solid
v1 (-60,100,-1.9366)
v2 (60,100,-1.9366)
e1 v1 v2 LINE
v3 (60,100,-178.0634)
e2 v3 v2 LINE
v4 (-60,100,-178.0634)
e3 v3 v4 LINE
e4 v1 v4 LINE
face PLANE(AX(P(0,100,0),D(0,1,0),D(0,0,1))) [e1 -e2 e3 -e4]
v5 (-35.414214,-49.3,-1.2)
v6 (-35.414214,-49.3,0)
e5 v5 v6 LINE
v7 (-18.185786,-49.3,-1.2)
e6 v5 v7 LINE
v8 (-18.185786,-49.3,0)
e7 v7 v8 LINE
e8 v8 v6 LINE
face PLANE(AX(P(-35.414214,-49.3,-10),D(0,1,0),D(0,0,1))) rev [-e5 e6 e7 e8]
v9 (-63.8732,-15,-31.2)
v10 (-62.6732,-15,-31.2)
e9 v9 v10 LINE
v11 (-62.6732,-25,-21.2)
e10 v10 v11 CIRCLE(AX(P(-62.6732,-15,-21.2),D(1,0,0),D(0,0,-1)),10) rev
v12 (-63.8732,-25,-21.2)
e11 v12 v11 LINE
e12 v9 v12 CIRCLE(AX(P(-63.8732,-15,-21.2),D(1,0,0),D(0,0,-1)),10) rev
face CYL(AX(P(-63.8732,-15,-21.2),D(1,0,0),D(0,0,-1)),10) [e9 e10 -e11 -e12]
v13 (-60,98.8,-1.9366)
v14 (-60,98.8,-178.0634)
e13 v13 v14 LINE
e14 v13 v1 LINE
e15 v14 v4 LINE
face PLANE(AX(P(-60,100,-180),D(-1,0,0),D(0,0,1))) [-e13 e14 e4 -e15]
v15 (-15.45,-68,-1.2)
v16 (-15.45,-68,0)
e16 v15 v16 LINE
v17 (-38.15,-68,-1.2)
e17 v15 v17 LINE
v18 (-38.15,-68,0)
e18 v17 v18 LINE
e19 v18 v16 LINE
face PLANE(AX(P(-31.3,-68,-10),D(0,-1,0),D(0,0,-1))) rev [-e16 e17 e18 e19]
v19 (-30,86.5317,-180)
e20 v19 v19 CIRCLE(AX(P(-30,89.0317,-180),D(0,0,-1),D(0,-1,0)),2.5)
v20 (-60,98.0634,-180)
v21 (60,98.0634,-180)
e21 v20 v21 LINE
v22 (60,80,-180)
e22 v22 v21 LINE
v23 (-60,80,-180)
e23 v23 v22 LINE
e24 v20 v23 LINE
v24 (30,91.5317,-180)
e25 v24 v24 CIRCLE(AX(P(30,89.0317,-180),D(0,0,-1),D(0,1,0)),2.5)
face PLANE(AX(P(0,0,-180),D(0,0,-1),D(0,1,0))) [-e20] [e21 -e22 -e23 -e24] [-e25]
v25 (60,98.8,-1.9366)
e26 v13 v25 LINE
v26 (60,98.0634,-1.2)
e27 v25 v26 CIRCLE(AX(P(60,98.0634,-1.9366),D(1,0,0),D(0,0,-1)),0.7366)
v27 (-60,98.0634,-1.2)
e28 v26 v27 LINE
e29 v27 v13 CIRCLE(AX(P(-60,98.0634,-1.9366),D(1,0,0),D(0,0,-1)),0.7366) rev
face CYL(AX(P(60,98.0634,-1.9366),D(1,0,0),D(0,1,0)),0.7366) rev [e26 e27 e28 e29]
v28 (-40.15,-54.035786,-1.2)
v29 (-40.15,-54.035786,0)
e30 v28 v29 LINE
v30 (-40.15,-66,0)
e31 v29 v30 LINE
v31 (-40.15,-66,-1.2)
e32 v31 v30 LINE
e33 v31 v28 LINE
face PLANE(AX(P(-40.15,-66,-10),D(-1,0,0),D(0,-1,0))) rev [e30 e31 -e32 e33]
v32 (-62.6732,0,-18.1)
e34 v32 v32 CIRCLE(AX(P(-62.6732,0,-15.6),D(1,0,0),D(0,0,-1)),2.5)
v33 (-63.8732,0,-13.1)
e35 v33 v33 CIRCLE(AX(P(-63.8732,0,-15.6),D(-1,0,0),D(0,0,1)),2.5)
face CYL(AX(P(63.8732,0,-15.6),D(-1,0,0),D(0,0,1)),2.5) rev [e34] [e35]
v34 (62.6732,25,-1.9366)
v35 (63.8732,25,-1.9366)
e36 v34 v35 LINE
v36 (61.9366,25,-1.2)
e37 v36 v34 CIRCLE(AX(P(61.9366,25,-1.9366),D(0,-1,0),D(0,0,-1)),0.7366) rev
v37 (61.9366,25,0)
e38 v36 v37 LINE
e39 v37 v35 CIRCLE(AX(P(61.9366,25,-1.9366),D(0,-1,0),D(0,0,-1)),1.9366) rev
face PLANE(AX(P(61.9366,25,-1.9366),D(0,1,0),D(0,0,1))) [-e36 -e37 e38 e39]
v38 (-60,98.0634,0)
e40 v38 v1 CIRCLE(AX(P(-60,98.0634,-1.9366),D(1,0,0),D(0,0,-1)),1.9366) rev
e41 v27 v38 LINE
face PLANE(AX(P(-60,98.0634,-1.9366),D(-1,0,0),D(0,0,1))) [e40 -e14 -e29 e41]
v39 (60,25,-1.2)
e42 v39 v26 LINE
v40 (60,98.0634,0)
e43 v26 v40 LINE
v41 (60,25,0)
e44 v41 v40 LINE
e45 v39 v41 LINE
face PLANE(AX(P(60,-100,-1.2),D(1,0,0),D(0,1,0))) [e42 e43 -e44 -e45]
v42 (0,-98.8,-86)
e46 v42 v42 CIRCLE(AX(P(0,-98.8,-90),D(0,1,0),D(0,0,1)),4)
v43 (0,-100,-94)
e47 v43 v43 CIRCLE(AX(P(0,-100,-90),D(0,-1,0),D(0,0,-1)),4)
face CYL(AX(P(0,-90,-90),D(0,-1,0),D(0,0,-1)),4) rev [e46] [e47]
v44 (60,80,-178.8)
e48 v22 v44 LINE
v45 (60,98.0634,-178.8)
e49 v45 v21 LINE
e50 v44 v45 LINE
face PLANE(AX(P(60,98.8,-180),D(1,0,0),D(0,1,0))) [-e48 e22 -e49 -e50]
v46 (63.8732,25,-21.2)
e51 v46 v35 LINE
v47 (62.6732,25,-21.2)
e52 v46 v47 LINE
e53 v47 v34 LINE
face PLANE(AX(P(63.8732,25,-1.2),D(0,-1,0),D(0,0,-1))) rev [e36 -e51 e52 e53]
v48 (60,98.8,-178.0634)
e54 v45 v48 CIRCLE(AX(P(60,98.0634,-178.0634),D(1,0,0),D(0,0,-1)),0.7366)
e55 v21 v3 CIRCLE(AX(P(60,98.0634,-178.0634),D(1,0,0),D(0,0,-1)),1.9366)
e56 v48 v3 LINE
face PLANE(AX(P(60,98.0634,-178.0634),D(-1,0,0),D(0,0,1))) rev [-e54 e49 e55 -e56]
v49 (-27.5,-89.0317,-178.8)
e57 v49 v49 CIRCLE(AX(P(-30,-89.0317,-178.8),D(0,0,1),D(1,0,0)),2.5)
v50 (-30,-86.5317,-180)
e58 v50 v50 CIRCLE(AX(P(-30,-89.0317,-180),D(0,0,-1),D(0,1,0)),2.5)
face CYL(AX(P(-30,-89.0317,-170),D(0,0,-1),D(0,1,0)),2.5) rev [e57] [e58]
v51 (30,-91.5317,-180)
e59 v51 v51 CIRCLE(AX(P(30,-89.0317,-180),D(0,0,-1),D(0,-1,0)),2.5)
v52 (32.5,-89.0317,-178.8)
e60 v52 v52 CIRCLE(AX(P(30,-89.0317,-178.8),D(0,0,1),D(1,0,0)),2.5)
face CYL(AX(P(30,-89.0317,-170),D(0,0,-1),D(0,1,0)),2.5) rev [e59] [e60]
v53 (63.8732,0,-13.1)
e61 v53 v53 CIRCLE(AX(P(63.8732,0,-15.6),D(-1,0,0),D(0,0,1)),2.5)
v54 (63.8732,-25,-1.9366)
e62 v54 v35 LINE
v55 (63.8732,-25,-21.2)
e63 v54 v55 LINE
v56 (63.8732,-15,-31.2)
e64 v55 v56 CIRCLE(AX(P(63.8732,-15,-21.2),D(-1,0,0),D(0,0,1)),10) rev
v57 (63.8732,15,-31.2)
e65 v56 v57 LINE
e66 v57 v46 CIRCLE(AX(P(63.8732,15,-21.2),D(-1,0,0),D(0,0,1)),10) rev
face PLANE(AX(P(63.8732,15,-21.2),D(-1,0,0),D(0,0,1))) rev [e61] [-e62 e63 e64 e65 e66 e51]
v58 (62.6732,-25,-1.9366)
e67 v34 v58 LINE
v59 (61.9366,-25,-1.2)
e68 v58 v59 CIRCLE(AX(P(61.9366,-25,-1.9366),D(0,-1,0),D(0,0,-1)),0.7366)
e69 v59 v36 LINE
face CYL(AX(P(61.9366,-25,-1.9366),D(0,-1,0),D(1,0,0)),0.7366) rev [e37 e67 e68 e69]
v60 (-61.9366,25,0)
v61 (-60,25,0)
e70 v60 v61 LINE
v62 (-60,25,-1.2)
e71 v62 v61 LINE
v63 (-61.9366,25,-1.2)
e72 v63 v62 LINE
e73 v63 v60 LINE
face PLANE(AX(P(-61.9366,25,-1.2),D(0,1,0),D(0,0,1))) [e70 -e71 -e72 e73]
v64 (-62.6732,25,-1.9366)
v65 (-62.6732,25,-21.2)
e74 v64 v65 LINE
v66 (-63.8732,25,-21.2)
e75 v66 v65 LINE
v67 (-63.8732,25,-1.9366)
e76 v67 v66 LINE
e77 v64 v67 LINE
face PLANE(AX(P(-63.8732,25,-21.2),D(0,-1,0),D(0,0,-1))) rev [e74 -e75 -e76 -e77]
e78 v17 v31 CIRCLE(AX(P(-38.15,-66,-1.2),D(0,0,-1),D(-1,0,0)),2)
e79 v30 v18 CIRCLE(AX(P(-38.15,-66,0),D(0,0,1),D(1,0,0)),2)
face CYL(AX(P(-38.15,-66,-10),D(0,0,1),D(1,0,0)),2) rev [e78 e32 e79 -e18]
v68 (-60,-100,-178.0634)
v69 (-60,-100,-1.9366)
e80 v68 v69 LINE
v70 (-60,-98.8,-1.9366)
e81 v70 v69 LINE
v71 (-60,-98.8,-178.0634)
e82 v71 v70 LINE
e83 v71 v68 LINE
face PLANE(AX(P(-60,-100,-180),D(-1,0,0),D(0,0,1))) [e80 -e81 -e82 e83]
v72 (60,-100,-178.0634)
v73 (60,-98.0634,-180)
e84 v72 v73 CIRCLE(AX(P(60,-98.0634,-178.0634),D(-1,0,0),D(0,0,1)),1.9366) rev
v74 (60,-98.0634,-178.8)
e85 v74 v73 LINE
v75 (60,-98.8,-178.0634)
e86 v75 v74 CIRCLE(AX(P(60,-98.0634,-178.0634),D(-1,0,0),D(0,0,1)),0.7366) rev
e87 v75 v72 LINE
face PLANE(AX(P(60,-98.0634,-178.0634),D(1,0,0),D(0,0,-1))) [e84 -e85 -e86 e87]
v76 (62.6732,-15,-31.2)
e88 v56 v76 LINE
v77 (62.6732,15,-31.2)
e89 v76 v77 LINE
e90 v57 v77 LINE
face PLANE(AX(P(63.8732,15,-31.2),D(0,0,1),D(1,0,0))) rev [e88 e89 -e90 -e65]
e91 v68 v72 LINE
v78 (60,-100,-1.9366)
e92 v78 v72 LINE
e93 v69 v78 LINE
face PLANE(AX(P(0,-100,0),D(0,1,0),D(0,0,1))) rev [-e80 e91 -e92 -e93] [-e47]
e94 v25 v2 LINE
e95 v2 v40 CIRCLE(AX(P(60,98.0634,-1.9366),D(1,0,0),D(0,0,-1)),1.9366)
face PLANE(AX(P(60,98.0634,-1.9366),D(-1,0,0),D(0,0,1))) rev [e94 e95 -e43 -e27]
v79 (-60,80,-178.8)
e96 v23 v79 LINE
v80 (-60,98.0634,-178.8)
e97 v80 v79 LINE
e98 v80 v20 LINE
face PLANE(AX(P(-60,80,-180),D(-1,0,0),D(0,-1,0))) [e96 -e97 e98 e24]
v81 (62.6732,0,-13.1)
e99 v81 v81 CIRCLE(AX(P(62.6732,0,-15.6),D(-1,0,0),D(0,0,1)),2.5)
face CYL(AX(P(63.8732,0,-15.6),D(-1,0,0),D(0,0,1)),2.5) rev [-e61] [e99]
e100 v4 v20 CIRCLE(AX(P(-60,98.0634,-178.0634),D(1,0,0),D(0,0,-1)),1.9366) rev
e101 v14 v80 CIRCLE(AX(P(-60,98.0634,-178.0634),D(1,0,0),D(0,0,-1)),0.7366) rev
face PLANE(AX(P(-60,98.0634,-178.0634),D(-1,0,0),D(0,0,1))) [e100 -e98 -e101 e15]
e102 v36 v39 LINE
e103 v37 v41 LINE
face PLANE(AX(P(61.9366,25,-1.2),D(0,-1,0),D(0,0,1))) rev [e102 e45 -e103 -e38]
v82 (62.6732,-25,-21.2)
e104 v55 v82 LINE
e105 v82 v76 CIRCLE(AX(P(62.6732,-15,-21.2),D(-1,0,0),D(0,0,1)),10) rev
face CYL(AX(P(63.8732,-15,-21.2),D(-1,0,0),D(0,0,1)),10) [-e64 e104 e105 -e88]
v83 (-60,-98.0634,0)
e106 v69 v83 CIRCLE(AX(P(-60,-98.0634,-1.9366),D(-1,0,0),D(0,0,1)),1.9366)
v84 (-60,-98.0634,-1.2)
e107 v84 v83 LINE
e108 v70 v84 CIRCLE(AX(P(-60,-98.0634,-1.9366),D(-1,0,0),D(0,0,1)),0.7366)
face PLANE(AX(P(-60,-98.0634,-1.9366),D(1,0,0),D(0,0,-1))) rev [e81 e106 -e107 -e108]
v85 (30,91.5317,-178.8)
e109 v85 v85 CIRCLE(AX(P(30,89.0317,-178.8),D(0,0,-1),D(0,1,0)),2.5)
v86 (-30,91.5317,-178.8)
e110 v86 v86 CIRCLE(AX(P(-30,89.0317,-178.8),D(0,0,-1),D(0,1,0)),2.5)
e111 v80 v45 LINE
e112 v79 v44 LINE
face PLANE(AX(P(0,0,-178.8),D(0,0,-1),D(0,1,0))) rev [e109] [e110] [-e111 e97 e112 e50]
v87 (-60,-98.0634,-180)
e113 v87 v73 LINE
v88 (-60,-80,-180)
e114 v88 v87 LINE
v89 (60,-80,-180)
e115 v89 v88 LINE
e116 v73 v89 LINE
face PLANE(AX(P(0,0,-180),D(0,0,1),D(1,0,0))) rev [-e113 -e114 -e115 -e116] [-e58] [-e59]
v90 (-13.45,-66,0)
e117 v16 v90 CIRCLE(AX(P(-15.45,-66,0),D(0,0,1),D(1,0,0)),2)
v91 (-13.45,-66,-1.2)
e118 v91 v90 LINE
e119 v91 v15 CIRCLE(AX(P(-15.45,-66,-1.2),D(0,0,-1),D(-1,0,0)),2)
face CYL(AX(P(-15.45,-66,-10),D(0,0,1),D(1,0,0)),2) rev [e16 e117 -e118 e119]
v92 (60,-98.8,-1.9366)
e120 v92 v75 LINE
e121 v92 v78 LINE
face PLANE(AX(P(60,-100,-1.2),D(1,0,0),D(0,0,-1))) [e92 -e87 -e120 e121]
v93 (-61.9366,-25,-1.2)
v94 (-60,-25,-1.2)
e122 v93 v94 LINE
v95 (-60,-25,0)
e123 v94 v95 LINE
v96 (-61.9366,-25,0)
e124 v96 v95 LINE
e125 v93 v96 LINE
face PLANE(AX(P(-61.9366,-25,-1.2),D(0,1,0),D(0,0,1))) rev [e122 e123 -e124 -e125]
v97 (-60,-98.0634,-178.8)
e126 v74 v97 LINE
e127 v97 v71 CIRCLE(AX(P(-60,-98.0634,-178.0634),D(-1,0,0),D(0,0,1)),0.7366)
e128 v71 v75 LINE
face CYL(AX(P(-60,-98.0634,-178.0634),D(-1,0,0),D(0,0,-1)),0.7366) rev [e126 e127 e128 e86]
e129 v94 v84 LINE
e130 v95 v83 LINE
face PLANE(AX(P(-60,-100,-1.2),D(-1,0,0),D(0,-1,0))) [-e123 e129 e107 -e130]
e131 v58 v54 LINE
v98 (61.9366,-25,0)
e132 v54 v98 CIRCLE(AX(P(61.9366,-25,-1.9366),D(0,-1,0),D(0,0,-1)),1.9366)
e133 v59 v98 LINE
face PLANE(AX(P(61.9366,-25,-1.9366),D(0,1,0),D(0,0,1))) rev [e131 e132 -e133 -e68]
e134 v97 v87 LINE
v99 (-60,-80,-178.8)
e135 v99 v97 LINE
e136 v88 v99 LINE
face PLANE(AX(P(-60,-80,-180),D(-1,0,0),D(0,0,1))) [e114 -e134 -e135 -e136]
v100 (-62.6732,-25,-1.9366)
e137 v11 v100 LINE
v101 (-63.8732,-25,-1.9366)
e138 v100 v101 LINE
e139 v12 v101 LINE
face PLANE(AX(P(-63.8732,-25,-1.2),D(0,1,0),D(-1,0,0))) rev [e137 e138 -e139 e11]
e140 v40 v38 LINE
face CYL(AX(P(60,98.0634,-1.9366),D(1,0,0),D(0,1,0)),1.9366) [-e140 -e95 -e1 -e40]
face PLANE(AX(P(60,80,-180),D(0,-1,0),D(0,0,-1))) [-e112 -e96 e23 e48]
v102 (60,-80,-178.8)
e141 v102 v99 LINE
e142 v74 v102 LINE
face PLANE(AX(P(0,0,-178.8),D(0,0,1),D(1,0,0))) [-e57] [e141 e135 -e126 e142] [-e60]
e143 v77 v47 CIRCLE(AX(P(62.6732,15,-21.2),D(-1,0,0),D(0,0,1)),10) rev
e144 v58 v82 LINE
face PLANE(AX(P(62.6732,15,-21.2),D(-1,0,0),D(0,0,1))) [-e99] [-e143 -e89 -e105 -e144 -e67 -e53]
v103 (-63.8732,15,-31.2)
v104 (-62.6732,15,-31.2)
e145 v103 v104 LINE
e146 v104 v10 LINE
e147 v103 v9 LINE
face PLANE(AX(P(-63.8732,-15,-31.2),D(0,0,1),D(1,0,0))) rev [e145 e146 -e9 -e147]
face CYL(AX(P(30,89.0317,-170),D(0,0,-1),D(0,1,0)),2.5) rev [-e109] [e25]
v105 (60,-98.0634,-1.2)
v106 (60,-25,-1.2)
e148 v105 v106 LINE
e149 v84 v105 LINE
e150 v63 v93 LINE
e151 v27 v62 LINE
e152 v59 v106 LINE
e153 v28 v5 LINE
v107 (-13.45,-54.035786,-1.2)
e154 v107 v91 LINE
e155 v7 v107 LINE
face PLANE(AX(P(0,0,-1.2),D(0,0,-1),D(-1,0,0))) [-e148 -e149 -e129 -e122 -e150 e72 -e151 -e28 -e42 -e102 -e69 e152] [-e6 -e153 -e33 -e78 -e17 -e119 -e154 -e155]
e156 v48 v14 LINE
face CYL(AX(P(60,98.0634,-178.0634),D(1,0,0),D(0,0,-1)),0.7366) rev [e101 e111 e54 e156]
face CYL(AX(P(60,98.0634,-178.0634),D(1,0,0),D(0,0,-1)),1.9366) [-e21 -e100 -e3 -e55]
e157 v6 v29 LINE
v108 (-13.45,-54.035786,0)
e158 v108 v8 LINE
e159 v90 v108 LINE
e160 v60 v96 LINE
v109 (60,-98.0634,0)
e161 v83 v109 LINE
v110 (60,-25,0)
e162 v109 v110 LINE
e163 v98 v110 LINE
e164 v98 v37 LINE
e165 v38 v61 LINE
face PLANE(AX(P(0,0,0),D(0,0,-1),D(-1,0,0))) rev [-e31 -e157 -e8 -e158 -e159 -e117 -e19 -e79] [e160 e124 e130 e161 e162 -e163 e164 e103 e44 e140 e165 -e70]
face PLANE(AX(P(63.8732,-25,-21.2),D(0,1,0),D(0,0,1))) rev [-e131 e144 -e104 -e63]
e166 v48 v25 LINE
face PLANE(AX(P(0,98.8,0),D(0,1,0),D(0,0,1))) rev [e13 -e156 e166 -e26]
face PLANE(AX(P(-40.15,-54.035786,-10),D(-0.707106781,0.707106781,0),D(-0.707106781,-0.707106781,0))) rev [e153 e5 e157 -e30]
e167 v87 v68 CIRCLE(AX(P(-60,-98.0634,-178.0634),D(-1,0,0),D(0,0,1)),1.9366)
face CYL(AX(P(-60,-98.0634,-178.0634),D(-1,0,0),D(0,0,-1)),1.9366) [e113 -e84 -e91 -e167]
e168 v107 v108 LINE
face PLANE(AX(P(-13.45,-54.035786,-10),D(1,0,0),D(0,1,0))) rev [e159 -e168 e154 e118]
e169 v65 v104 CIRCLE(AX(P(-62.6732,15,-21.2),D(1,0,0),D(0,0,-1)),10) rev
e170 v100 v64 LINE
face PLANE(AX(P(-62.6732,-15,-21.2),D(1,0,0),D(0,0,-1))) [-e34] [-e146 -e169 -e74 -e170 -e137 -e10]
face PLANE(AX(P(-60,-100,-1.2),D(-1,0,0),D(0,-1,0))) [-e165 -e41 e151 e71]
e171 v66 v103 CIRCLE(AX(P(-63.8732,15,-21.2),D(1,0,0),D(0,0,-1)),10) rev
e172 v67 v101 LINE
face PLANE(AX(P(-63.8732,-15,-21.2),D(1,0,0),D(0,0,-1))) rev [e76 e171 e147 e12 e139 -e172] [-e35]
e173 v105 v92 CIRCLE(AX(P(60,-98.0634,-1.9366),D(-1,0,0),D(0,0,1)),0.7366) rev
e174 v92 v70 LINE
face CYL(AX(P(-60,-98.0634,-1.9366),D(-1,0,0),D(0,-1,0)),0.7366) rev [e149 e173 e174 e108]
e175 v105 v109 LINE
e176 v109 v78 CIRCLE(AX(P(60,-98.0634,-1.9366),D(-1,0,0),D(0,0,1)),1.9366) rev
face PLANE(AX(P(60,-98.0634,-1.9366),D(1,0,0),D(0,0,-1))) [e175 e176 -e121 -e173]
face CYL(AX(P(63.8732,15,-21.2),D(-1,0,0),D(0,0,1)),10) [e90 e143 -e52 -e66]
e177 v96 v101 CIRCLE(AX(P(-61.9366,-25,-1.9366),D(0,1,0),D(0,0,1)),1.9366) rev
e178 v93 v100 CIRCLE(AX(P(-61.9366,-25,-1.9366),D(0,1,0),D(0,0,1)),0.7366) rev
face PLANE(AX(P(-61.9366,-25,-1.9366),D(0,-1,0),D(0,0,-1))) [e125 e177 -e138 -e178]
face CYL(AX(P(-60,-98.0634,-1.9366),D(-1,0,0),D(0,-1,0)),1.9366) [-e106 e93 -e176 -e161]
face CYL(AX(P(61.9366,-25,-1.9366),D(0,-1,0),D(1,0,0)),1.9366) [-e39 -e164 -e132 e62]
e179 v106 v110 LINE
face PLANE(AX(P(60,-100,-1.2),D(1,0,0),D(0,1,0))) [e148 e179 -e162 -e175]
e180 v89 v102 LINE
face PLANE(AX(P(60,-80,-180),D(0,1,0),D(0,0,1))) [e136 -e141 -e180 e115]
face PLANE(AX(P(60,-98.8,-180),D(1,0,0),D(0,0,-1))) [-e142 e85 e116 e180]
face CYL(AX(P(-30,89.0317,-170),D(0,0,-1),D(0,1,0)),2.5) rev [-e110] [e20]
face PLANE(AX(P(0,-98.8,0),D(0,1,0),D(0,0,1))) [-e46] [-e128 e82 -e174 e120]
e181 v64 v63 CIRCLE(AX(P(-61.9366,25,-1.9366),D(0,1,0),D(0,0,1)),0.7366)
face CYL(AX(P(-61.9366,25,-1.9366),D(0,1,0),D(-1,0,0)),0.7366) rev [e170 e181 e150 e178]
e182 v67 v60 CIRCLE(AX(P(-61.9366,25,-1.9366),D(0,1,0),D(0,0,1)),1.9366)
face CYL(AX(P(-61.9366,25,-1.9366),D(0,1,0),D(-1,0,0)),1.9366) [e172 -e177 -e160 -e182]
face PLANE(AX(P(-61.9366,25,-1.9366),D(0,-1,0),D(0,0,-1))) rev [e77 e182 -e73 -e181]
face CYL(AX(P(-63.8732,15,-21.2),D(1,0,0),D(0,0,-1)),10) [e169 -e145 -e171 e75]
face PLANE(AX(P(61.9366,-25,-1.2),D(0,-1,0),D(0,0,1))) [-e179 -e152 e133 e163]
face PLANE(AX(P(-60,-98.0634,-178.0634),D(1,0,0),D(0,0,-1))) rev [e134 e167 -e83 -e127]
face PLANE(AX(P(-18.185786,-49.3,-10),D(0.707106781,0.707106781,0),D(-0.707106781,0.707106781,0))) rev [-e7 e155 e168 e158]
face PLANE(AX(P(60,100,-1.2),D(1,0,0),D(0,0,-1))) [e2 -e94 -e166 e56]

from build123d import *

# Parameters (mm, degrees)
SKETCH1_W                      = 120
SKETCH1_H                      = 200
BASE_FLANGE1_DEPTH             = 1.2
EDGE_FLANGE1_STRIP_W           = 6.2732
EDGE_FLANGE1_STRIP_H           = 1.2
EDGE_FLANGE1_STRIP_CUT_DEPTH   = 120
EDGE_FLANGE1_STRIP_2_W         = 6.2732
EDGE_FLANGE1_STRIP_2_H         = 1.2
EDGE_FLANGE1_STRIP_CUT_2_DEPTH = 120
EDGE_FLANGE1_DEPTH             = 120
EDGE_FLANGE1_BEND_DEPTH        = 120
EDGE_FLANGE3_START             = -121.9366
EDGE_FLANGE3_OUTLINE_W         = 50
EDGE_FLANGE3_OUTLINE_H         = 1.2
EDGE_FLANGE3_DEPTH             = 123.8732
EDGE_FLANGE3_START_2           = -25
EDGE_FLANGE3_2_DEPTH           = 50
EDGE_FLANGE3_START_3           = -65
EDGE_FLANGE3_3_DEPTH           = 130
EDGE_FLANGE4_STRIP_W           = 6.2732
EDGE_FLANGE4_STRIP_H           = 1.2
EDGE_FLANGE4_STRIP_CUT_DEPTH   = 120
EDGE_FLANGE4_STRIP_2_W         = 6.2732
EDGE_FLANGE4_STRIP_2_H         = 1.2
EDGE_FLANGE4_STRIP_CUT_2_DEPTH = 120
EDGE_FLANGE4_DEPTH             = 120
EDGE_FLANGE4_BEND_DEPTH        = 120
SKETCH34_R                     = 4
CUT_EXTRUDE1_DEPTH             = 10
CUT_EXTRUDE2_DEPTH             = 10
SKETCH36_R                     = 2.5
CUT_EXTRUDE3_DEPTH             = 243.320330787
SKETCH37_R                     = 2.5
CUT_EXTRUDE4_DEPTH             = 10


with BuildPart() as part:
    # Base-Flange1: sheet metal written as solids
    # Sketch1 → Base-Flange1 (new body)
    with BuildSketch(Plane.XY):
        Rectangle(SKETCH1_W, SKETCH1_H)
    extrude(amount=-BASE_FLANGE1_DEPTH)

    # Edge-Flange1: sheet metal written as solids
    # Edge-Flange1 strip (on a plane across the edge) → Edge-Flange1 strip cut (cut)
    with BuildSketch(Plane(origin=(-60, 100, -1.2), x_dir=(0, -1, 0), z_dir=(1, 0, 0))):
        with Locations((-1.2, -0.6)):
            Rectangle(EDGE_FLANGE1_STRIP_W, EDGE_FLANGE1_STRIP_H)
    extrude(amount=EDGE_FLANGE1_STRIP_CUT_DEPTH, mode=Mode.SUBTRACT)

    # Edge-Flange1 strip 2 (on a plane across the edge) → Edge-Flange1 strip cut 2 (cut)
    with BuildSketch(Plane(origin=(60, -100, -1.2), x_dir=(0, 1, 0), z_dir=(-1, 0, 0))):
        with Locations((-1.2, -0.6)):
            Rectangle(EDGE_FLANGE1_STRIP_2_W, EDGE_FLANGE1_STRIP_2_H)
    extrude(amount=EDGE_FLANGE1_STRIP_CUT_2_DEPTH, mode=Mode.SUBTRACT)

    # Edge-Flange1 section (on a plane across the edge) → Edge-Flange1 (add)
    with BuildSketch(Plane(origin=(-60, 100, -1.2), x_dir=(0, -1, 0), z_dir=(1, 0, 0))):
        with BuildLine():
            Line((0, 0.7366), (0, 178.8))
            Line((0, 178.8), (1.2, 178.8))
            Line((1.2, 178.8), (1.2, 0.7366))
            ThreePointArc((1.2, 0.7366), (1.415745145, 0.215745145), (1.9366, 0))
            Line((1.9366, 0), (1.9366, -1.2))
            ThreePointArc((1.9366, -1.2), (0.567217008, -0.632782992), (0, 0.7366))
        make_face()
    extrude(amount=EDGE_FLANGE1_DEPTH)

    # Edge-Flange1 section 2 (on a plane across the edge) → Edge-Flange1 bend (add)
    with BuildSketch(Plane(origin=(60, -100, -1.2), x_dir=(0, 1, 0), z_dir=(-1, 0, 0))):
        with BuildLine():
            Line((0, 0.7366), (0, 178.8))
            Line((0, 178.8), (1.2, 178.8))
            Line((1.2, 178.8), (1.2, 0.7366))
            ThreePointArc((1.2, 0.7366), (1.415745145, 0.215745145), (1.9366, 0))
            Line((1.9366, 0), (1.9366, -1.2))
            ThreePointArc((1.9366, -1.2), (0.567217008, -0.632782992), (0, 0.7366))
        make_face()
    extrude(amount=EDGE_FLANGE1_BEND_DEPTH)

    # Edge-Flange3: read off the stored shape, not the designer's step
    # Edge-Flange3 outline → Edge-Flange3 (add)
    with BuildSketch(Plane(origin=(60, 0, -1.2), x_dir=(0, -1, 0), z_dir=(1, 0, 0)).offset(EDGE_FLANGE3_START)):
        with Locations((0, -0.6)):
            Rectangle(EDGE_FLANGE3_OUTLINE_W, EDGE_FLANGE3_OUTLINE_H)
    extrude(amount=EDGE_FLANGE3_DEPTH)

    # Edge-Flange3 2 outline → Edge-Flange3 2 (add)
    with BuildSketch(Plane(origin=(0, 0, 0), x_dir=(1, 0, 0), z_dir=(0, 1, 0)).offset(EDGE_FLANGE3_START_2)):
        with BuildLine():
            ThreePointArc((61.9366, 0), (63.305982992, 0.567217008), (63.8732, 1.9366))
            Line((63.8732, 1.9366), (63.8732, 31.2))
            Line((63.8732, 31.2), (62.6732, 31.2))
            Line((62.6732, 31.2), (62.6732, 1.9366))
            ThreePointArc((62.6732, 1.9366), (62.457454855, 1.415745145), (61.9366, 1.2))
            Line((61.9366, 1.2), (61.9366, 0))
        make_face()
        with BuildLine():
            Line((-62.6732, 31.2), (-63.8732, 31.2))
            Line((-63.8732, 31.2), (-63.8732, 1.9366))
            ThreePointArc((-63.8732, 1.9366), (-63.305982992, 0.567217008), (-61.9366, 0))
            Line((-61.9366, 0), (-61.9366, 1.2))
            ThreePointArc((-61.9366, 1.2), (-62.457454855, 1.415745145), (-62.6732, 1.9366))
            Line((-62.6732, 1.9366), (-62.6732, 31.2))
        make_face()
    extrude(amount=EDGE_FLANGE3_2_DEPTH)

    # Edge-Flange3 3 outline → Edge-Flange3 3 (cut)
    with BuildSketch(Plane.YZ.offset(EDGE_FLANGE3_START_3)):
        with BuildLine():
            Line((-25, -31.2), (-15, -31.2))
            ThreePointArc((-15, -31.2), (-22.071067812, -28.271067812), (-25, -21.2))
            Line((-25, -21.2), (-25, -31.2))
        make_face()
        with BuildLine():
            ThreePointArc((25, -21.2), (22.071067812, -28.271067812), (15, -31.2))
            Line((15, -31.2), (25, -31.2))
            Line((25, -31.2), (25, -21.2))
        make_face()
    extrude(amount=EDGE_FLANGE3_3_DEPTH, mode=Mode.SUBTRACT)

    # Edge-Flange4: sheet metal written as solids
    # Edge-Flange4 strip (on a plane across the edge) → Edge-Flange4 strip cut (cut)
    with BuildSketch(Plane(origin=(-60, 98.8, -180), x_dir=(0, 0, 1), z_dir=(1, 0, 0))):
        with Locations((-1.2, -0.6)):
            Rectangle(EDGE_FLANGE4_STRIP_W, EDGE_FLANGE4_STRIP_H)
    extrude(amount=EDGE_FLANGE4_STRIP_CUT_DEPTH, mode=Mode.SUBTRACT)

    # Edge-Flange4 strip 2 (on a plane across the edge) → Edge-Flange4 strip cut 2 (cut)
    with BuildSketch(Plane(origin=(60, -98.8, -180), x_dir=(0, 0, 1), z_dir=(-1, 0, 0))):
        with Locations((-1.2, -0.6)):
            Rectangle(EDGE_FLANGE4_STRIP_2_W, EDGE_FLANGE4_STRIP_2_H)
    extrude(amount=EDGE_FLANGE4_STRIP_CUT_2_DEPTH, mode=Mode.SUBTRACT)

    # Edge-Flange4 section (on a plane across the edge) → Edge-Flange4 (add)
    with BuildSketch(Plane(origin=(-60, 98.8, -180), x_dir=(0, 0, 1), z_dir=(1, 0, 0))):
        with BuildLine():
            Line((0, 0.7366), (0, 18.8))
            Line((0, 18.8), (1.2, 18.8))
            Line((1.2, 18.8), (1.2, 0.7366))
            ThreePointArc((1.2, 0.7366), (1.415745145, 0.215745145), (1.9366, 0))
            Line((1.9366, 0), (1.9366, -1.2))
            ThreePointArc((1.9366, -1.2), (0.567217008, -0.632782992), (0, 0.7366))
        make_face()
    extrude(amount=EDGE_FLANGE4_DEPTH)

    # Edge-Flange4 section 2 (on a plane across the edge) → Edge-Flange4 bend (add)
    with BuildSketch(Plane(origin=(60, -98.8, -180), x_dir=(0, 0, 1), z_dir=(-1, 0, 0))):
        with BuildLine():
            Line((0, 0.7366), (0, 18.8))
            Line((0, 18.8), (1.2, 18.8))
            Line((1.2, 18.8), (1.2, 0.7366))
            ThreePointArc((1.2, 0.7366), (1.415745145, 0.215745145), (1.9366, 0))
            Line((1.9366, 0), (1.9366, -1.2))
            ThreePointArc((1.9366, -1.2), (0.567217008, -0.632782992), (0, 0.7366))
        make_face()
    extrude(amount=EDGE_FLANGE4_BEND_DEPTH)

    # Sketch34 → Cut-Extrude1 (cut)
    with BuildSketch(Plane.XZ.offset(100)):
        with Locations(Location((0, -90, 0), (0, 0, 270))):
            Circle(SKETCH34_R)
    extrude(amount=-CUT_EXTRUDE1_DEPTH, mode=Mode.SUBTRACT)

    # Sketch35 → Cut-Extrude2 (cut)
    with BuildSketch(Plane.XY):
        with BuildLine():
            Line((-31.3, -68), (-38.15, -68))
            ThreePointArc((-38.15, -68), (-39.564213562, -67.414213562), (-40.15, -66))
            Line((-40.15, -66), (-40.15, -54.035786438))
            Line((-40.15, -54.035786438), (-35.414213562, -49.3))
            Line((-35.414213562, -49.3), (-18.185786438, -49.3))
            Line((-18.185786438, -49.3), (-13.45, -54.035786438))
            Line((-13.45, -54.035786438), (-13.45, -66))
            ThreePointArc((-13.45, -66), (-14.035786438, -67.414213562), (-15.45, -68))
            Line((-15.45, -68), (-22.3, -68))
            Line((-22.3, -68), (-22.55, -68))
            Line((-22.55, -68), (-31.05, -68))
            Line((-31.05, -68), (-31.3, -68))
        make_face()
    extrude(amount=-CUT_EXTRUDE2_DEPTH, mode=Mode.SUBTRACT)

    # Sketch36 → Cut-Extrude3 (cut, through all)
    with BuildSketch(Plane.ZY.offset(63.8732)):
        with Locations((-15.6, 0)):
            Circle(SKETCH36_R)
    extrude(amount=-CUT_EXTRUDE3_DEPTH, mode=Mode.SUBTRACT)

    # Sketch37 → Cut-Extrude4 (cut)
    with BuildSketch(Plane(origin=(0, 0, -180), x_dir=(-1, 0, 0), z_dir=(0, 0, -1))):
        with Locations(Location((-30, 89.0317, 0), (0, 0, 90))):
            Circle(SKETCH37_R)
        with Locations(Location((30, 89.0317, 0), (0, 0, 90))):
            Circle(SKETCH37_R)
        with Locations(Location((30, -89.0317, 0), (0, 0, 90))):
            Circle(SKETCH37_R)
        with Locations(Location((-30, -89.0317, 0), (0, 0, 180))):
            Circle(SKETCH37_R)
    extrude(amount=-CUT_EXTRUDE4_DEPTH, mode=Mode.SUBTRACT)


solid = part.part
